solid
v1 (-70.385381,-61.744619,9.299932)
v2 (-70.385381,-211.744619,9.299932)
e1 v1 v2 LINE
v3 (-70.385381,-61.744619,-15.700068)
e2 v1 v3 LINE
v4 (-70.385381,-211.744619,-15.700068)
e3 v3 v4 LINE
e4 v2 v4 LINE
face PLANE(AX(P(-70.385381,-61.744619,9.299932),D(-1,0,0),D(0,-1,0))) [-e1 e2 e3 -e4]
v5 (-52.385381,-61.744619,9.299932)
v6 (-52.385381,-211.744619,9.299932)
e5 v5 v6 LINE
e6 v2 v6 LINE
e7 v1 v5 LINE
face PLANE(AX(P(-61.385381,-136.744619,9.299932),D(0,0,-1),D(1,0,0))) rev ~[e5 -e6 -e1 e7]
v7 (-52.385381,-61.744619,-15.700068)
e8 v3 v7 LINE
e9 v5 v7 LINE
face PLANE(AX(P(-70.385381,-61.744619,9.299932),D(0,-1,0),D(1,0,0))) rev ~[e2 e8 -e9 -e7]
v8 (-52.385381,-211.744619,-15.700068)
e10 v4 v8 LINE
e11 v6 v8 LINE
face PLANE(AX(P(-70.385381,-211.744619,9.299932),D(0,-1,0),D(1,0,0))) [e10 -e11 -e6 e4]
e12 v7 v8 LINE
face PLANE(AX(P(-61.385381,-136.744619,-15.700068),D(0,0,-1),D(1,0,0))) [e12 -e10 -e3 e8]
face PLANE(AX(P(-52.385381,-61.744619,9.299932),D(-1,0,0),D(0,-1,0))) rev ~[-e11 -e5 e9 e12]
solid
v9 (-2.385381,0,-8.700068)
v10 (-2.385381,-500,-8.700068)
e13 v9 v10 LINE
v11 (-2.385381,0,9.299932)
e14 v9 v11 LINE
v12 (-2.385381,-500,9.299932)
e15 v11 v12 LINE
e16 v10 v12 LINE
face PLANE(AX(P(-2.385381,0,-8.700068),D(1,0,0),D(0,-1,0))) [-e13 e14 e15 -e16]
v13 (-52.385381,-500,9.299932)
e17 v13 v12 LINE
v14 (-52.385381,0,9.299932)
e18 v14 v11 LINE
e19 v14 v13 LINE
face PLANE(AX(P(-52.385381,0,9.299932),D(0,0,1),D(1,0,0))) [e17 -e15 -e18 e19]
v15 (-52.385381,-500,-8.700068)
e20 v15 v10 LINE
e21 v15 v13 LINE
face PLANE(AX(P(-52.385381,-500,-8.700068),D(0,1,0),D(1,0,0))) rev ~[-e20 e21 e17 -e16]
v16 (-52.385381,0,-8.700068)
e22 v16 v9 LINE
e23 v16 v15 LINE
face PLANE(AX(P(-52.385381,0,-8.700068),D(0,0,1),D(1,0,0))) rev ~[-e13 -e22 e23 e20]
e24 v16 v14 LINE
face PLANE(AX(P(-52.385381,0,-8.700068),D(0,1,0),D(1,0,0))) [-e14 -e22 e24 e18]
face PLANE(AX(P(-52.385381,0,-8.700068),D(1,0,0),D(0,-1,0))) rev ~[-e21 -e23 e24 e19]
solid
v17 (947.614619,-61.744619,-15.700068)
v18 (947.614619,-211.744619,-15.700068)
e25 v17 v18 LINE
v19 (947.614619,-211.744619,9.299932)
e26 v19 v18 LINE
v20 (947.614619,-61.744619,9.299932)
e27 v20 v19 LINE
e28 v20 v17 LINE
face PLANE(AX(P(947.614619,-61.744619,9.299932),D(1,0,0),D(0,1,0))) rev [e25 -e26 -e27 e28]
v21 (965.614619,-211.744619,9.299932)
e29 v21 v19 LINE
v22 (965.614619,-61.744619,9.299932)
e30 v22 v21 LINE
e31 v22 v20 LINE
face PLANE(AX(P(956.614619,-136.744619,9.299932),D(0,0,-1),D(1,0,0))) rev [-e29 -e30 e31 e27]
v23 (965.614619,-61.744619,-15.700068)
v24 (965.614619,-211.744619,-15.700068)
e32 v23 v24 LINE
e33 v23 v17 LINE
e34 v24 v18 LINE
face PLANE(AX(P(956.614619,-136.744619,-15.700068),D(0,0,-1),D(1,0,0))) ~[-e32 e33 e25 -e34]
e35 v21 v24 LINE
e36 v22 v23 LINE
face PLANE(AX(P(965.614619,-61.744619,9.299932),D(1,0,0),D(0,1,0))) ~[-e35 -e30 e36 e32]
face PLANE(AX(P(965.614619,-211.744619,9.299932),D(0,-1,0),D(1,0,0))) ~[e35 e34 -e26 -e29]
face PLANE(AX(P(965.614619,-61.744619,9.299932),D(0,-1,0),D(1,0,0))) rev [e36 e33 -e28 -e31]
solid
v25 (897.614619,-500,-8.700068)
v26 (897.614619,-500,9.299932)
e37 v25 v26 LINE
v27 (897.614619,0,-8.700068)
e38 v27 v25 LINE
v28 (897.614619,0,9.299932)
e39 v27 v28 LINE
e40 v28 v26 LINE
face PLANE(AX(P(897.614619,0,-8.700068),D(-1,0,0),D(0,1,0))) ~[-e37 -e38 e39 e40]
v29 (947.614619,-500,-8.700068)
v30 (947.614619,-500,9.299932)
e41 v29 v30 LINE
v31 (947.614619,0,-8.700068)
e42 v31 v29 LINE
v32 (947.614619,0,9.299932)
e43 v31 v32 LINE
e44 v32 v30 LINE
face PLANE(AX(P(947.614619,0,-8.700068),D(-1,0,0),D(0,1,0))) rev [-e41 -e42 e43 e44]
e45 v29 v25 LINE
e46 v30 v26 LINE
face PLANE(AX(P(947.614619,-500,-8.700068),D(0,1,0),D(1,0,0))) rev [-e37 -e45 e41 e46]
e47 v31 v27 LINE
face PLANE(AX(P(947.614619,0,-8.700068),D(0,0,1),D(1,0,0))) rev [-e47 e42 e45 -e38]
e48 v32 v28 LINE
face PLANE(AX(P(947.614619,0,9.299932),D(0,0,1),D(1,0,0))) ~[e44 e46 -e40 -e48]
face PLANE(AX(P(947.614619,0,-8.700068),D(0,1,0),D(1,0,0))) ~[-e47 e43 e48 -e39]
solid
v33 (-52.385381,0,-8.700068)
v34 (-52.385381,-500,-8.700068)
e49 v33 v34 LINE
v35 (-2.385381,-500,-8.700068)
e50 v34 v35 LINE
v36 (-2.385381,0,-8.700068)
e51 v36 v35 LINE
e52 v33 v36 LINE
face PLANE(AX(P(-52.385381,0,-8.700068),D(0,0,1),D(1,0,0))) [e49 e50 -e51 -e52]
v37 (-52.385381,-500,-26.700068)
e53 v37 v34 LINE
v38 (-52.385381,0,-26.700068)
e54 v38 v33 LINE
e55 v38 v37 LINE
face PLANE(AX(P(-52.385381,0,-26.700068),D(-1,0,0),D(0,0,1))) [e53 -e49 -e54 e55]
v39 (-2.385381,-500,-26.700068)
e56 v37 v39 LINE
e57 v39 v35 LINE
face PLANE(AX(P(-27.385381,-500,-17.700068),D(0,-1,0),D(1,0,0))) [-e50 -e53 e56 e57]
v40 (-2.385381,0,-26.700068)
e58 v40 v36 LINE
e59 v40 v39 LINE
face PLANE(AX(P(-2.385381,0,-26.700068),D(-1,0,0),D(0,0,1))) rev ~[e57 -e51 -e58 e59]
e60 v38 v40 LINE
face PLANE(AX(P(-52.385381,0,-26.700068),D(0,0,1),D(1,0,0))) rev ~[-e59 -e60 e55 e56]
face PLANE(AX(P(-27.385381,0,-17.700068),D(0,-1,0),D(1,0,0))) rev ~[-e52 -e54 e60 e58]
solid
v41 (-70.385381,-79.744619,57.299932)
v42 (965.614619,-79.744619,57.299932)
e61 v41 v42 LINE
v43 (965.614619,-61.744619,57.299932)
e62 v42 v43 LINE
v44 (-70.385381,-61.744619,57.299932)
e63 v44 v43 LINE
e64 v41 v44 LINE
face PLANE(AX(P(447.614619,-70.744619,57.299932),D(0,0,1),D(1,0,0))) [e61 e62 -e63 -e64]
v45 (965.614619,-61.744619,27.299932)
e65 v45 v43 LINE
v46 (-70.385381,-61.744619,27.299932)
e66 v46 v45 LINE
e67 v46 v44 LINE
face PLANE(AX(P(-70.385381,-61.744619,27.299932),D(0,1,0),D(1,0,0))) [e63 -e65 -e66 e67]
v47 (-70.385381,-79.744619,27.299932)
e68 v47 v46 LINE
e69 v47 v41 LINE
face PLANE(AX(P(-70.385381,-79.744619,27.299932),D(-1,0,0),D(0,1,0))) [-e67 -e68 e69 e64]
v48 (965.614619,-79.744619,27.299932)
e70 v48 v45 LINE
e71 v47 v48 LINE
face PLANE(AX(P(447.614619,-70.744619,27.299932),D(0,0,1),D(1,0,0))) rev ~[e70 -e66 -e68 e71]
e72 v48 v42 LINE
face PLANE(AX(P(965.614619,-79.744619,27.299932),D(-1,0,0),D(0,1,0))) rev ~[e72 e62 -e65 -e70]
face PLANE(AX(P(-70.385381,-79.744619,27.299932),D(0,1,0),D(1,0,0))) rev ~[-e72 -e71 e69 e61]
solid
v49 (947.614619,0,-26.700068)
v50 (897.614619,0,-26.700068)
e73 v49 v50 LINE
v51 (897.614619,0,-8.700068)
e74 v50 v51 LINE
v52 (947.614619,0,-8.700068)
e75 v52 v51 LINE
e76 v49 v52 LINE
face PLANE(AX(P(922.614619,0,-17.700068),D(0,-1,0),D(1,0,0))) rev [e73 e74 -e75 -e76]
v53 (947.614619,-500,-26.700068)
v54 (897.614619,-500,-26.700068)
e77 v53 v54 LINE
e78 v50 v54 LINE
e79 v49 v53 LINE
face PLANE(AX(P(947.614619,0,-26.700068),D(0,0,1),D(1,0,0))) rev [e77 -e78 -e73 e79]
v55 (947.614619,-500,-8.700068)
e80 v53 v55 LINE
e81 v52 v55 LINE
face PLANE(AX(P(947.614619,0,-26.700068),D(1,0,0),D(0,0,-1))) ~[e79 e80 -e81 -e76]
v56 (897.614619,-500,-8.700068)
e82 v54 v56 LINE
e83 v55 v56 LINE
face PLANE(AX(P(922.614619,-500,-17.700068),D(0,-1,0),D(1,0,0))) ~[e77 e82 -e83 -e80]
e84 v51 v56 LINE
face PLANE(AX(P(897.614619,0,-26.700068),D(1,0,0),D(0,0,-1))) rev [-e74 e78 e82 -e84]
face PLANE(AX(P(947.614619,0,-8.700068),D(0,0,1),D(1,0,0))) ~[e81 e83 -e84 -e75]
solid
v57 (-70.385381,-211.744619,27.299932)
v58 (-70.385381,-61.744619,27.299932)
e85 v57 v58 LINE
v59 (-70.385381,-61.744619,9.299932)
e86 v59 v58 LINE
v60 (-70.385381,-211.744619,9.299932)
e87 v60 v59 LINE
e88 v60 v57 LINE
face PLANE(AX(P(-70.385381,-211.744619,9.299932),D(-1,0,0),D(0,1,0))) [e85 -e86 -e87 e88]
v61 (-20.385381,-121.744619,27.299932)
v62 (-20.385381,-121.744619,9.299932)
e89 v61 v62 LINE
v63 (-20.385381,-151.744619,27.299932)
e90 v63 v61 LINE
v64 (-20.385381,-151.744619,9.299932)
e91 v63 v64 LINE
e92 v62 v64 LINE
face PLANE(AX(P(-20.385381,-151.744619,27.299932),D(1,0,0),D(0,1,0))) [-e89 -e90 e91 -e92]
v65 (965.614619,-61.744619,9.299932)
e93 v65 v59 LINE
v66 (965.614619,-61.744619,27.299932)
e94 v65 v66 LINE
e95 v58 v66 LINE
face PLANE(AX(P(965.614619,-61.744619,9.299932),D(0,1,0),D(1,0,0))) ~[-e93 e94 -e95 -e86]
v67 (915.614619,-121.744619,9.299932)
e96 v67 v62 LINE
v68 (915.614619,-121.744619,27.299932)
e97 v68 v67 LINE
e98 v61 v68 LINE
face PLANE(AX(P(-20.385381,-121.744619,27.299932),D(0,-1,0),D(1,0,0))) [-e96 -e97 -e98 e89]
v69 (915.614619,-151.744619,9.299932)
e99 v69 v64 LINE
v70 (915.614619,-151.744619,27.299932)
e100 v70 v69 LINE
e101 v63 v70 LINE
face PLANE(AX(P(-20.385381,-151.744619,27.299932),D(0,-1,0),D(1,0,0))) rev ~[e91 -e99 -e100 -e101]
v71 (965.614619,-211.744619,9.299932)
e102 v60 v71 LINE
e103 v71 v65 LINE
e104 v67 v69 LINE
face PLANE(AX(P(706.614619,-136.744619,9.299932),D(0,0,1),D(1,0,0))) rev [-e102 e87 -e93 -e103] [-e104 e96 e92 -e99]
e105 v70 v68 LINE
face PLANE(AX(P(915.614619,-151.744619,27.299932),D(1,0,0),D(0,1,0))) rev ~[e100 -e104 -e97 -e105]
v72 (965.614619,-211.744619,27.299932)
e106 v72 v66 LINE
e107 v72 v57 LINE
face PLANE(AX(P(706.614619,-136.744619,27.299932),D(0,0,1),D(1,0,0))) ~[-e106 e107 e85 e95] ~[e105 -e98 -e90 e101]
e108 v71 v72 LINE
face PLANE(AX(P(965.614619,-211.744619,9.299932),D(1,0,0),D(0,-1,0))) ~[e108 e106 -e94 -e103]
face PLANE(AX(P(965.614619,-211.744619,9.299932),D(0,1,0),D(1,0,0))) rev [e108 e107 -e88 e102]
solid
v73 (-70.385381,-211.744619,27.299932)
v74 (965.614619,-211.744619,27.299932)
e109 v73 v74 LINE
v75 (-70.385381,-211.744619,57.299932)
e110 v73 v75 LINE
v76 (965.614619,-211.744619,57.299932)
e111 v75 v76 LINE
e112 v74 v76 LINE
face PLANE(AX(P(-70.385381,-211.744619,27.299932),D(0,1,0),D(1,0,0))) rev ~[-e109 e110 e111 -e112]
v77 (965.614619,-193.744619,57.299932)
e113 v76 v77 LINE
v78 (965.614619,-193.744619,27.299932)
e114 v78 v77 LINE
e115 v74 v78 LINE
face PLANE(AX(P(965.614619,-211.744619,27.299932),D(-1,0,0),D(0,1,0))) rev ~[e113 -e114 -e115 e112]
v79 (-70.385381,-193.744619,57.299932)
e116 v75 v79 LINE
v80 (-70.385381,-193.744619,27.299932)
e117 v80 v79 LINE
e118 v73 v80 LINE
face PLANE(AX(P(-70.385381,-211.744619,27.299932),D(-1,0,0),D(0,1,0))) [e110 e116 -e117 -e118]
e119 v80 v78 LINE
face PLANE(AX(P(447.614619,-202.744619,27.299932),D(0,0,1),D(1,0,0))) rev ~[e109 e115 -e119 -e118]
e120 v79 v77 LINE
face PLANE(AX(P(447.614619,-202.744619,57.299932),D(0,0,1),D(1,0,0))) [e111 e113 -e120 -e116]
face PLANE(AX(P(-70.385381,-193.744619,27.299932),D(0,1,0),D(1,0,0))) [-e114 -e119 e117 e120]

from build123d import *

# Parameters (mm, degrees)
F0_W      = 50
F0_H      = 18
F1_DEPTH  = 500
F2_DEPTH  = 18
F3_W      = 518
F3_H      = 150
F4_DEPTH  = 18
F5_W      = 18
F5_H      = 150
F6_DEPTH  = 25
F9_W      = 1036
F9_H      = 18
F10_DEPTH = 30
F9_W_2    = 936
F9_H_2    = 30
F11_DEPTH = 25


with BuildPart() as f1:
    # F0 (on Front) → F1 (new body)
    with BuildSketch(Plane.XZ):
        with Locations((-27.3853807012, -17.700068422)):
            Rectangle(F0_W, F0_H)
    extrude(amount=F1_DEPTH)


with BuildPart() as f2:
    # F2 (new): a face of the model
    f2_faces = [f1.part.faces().sort_by_distance(p)[0] for p in [
        (-27.3853807012, -250, -8.700068422),
    ]]
    extrude(f2_faces, amount=F2_DEPTH)


with BuildPart() as f4:
    # F3 (on face) → F4 (new body)
    with BuildSketch(Plane.XY.offset(9.299931578)):
        with Locations((188.6146192988, -136.7446185101)):
            Rectangle(F3_W, F3_H)
    extrude(amount=F4_DEPTH)

    # F8: F4 across face


with BuildPart() as f6:
    # F5 (on face) → F6 (new body)
    with BuildSketch(Plane(origin=(0, 0, 9.299931578), x_dir=(1, 0, 0), z_dir=(0, 0, -1))):
        with Locations((-61.3853807012, 136.7446185101)):
            Rectangle(F5_W, F5_H)
    extrude(amount=F6_DEPTH)


with BuildPart() as f7_1:
    # F7: instance of F2
    add(f2.part.mirror(Plane(origin=(447.6146192988, -136.7446185101, 18.299931578), x_dir=(0, 1, 0), z_dir=(1, 0, 0))))


with BuildPart() as f7_2:
    # F7: instance of F1
    add(f1.part.mirror(Plane(origin=(447.6146192988, -136.7446185101, 18.299931578), x_dir=(0, 1, 0), z_dir=(1, 0, 0))))


with BuildPart() as f7_3:
    # F7: instance of F6
    add(f6.part.mirror(Plane(origin=(447.6146192988, -136.7446185101, 18.299931578), x_dir=(0, 1, 0), z_dir=(1, 0, 0))))


with BuildPart() as f4_1:
    add(f4.part)
    add(f4.part.mirror(Plane(origin=(447.6146192988, -136.7446185101, 18.299931578), x_dir=(0, 1, 0), z_dir=(1, 0, 0))))

    # F9 (on face) → F11 (cut)
    with BuildSketch(Plane.XY.offset(27.299931578)):
        with Locations((447.6146192988, -136.7446185101)):
            Rectangle(F9_W_2, F9_H_2)
    extrude(amount=-F11_DEPTH, mode=Mode.SUBTRACT)


with BuildPart() as f10:
    # F9 (on face) → F10 (new body)
    with BuildSketch(Plane.XY.offset(27.299931578)):
        with Locations((447.6146192988, -70.7446185101)):
            Rectangle(F9_W, F9_H)
    extrude(amount=F10_DEPTH)


with BuildPart() as f10b:
    # F9 (on face) → F10, piece 2 (new body)
    with BuildSketch(Plane.XY.offset(27.299931578)):
        with Locations((447.6146192988, -202.7446185101)):
            Rectangle(F9_W, F9_H)
    extrude(amount=F10_DEPTH)


solid = Compound([f1.part, f2.part, f6.part, f7_1.part, f7_2.part, f7_3.part, f4_1.part, f10.part, f10b.part])
